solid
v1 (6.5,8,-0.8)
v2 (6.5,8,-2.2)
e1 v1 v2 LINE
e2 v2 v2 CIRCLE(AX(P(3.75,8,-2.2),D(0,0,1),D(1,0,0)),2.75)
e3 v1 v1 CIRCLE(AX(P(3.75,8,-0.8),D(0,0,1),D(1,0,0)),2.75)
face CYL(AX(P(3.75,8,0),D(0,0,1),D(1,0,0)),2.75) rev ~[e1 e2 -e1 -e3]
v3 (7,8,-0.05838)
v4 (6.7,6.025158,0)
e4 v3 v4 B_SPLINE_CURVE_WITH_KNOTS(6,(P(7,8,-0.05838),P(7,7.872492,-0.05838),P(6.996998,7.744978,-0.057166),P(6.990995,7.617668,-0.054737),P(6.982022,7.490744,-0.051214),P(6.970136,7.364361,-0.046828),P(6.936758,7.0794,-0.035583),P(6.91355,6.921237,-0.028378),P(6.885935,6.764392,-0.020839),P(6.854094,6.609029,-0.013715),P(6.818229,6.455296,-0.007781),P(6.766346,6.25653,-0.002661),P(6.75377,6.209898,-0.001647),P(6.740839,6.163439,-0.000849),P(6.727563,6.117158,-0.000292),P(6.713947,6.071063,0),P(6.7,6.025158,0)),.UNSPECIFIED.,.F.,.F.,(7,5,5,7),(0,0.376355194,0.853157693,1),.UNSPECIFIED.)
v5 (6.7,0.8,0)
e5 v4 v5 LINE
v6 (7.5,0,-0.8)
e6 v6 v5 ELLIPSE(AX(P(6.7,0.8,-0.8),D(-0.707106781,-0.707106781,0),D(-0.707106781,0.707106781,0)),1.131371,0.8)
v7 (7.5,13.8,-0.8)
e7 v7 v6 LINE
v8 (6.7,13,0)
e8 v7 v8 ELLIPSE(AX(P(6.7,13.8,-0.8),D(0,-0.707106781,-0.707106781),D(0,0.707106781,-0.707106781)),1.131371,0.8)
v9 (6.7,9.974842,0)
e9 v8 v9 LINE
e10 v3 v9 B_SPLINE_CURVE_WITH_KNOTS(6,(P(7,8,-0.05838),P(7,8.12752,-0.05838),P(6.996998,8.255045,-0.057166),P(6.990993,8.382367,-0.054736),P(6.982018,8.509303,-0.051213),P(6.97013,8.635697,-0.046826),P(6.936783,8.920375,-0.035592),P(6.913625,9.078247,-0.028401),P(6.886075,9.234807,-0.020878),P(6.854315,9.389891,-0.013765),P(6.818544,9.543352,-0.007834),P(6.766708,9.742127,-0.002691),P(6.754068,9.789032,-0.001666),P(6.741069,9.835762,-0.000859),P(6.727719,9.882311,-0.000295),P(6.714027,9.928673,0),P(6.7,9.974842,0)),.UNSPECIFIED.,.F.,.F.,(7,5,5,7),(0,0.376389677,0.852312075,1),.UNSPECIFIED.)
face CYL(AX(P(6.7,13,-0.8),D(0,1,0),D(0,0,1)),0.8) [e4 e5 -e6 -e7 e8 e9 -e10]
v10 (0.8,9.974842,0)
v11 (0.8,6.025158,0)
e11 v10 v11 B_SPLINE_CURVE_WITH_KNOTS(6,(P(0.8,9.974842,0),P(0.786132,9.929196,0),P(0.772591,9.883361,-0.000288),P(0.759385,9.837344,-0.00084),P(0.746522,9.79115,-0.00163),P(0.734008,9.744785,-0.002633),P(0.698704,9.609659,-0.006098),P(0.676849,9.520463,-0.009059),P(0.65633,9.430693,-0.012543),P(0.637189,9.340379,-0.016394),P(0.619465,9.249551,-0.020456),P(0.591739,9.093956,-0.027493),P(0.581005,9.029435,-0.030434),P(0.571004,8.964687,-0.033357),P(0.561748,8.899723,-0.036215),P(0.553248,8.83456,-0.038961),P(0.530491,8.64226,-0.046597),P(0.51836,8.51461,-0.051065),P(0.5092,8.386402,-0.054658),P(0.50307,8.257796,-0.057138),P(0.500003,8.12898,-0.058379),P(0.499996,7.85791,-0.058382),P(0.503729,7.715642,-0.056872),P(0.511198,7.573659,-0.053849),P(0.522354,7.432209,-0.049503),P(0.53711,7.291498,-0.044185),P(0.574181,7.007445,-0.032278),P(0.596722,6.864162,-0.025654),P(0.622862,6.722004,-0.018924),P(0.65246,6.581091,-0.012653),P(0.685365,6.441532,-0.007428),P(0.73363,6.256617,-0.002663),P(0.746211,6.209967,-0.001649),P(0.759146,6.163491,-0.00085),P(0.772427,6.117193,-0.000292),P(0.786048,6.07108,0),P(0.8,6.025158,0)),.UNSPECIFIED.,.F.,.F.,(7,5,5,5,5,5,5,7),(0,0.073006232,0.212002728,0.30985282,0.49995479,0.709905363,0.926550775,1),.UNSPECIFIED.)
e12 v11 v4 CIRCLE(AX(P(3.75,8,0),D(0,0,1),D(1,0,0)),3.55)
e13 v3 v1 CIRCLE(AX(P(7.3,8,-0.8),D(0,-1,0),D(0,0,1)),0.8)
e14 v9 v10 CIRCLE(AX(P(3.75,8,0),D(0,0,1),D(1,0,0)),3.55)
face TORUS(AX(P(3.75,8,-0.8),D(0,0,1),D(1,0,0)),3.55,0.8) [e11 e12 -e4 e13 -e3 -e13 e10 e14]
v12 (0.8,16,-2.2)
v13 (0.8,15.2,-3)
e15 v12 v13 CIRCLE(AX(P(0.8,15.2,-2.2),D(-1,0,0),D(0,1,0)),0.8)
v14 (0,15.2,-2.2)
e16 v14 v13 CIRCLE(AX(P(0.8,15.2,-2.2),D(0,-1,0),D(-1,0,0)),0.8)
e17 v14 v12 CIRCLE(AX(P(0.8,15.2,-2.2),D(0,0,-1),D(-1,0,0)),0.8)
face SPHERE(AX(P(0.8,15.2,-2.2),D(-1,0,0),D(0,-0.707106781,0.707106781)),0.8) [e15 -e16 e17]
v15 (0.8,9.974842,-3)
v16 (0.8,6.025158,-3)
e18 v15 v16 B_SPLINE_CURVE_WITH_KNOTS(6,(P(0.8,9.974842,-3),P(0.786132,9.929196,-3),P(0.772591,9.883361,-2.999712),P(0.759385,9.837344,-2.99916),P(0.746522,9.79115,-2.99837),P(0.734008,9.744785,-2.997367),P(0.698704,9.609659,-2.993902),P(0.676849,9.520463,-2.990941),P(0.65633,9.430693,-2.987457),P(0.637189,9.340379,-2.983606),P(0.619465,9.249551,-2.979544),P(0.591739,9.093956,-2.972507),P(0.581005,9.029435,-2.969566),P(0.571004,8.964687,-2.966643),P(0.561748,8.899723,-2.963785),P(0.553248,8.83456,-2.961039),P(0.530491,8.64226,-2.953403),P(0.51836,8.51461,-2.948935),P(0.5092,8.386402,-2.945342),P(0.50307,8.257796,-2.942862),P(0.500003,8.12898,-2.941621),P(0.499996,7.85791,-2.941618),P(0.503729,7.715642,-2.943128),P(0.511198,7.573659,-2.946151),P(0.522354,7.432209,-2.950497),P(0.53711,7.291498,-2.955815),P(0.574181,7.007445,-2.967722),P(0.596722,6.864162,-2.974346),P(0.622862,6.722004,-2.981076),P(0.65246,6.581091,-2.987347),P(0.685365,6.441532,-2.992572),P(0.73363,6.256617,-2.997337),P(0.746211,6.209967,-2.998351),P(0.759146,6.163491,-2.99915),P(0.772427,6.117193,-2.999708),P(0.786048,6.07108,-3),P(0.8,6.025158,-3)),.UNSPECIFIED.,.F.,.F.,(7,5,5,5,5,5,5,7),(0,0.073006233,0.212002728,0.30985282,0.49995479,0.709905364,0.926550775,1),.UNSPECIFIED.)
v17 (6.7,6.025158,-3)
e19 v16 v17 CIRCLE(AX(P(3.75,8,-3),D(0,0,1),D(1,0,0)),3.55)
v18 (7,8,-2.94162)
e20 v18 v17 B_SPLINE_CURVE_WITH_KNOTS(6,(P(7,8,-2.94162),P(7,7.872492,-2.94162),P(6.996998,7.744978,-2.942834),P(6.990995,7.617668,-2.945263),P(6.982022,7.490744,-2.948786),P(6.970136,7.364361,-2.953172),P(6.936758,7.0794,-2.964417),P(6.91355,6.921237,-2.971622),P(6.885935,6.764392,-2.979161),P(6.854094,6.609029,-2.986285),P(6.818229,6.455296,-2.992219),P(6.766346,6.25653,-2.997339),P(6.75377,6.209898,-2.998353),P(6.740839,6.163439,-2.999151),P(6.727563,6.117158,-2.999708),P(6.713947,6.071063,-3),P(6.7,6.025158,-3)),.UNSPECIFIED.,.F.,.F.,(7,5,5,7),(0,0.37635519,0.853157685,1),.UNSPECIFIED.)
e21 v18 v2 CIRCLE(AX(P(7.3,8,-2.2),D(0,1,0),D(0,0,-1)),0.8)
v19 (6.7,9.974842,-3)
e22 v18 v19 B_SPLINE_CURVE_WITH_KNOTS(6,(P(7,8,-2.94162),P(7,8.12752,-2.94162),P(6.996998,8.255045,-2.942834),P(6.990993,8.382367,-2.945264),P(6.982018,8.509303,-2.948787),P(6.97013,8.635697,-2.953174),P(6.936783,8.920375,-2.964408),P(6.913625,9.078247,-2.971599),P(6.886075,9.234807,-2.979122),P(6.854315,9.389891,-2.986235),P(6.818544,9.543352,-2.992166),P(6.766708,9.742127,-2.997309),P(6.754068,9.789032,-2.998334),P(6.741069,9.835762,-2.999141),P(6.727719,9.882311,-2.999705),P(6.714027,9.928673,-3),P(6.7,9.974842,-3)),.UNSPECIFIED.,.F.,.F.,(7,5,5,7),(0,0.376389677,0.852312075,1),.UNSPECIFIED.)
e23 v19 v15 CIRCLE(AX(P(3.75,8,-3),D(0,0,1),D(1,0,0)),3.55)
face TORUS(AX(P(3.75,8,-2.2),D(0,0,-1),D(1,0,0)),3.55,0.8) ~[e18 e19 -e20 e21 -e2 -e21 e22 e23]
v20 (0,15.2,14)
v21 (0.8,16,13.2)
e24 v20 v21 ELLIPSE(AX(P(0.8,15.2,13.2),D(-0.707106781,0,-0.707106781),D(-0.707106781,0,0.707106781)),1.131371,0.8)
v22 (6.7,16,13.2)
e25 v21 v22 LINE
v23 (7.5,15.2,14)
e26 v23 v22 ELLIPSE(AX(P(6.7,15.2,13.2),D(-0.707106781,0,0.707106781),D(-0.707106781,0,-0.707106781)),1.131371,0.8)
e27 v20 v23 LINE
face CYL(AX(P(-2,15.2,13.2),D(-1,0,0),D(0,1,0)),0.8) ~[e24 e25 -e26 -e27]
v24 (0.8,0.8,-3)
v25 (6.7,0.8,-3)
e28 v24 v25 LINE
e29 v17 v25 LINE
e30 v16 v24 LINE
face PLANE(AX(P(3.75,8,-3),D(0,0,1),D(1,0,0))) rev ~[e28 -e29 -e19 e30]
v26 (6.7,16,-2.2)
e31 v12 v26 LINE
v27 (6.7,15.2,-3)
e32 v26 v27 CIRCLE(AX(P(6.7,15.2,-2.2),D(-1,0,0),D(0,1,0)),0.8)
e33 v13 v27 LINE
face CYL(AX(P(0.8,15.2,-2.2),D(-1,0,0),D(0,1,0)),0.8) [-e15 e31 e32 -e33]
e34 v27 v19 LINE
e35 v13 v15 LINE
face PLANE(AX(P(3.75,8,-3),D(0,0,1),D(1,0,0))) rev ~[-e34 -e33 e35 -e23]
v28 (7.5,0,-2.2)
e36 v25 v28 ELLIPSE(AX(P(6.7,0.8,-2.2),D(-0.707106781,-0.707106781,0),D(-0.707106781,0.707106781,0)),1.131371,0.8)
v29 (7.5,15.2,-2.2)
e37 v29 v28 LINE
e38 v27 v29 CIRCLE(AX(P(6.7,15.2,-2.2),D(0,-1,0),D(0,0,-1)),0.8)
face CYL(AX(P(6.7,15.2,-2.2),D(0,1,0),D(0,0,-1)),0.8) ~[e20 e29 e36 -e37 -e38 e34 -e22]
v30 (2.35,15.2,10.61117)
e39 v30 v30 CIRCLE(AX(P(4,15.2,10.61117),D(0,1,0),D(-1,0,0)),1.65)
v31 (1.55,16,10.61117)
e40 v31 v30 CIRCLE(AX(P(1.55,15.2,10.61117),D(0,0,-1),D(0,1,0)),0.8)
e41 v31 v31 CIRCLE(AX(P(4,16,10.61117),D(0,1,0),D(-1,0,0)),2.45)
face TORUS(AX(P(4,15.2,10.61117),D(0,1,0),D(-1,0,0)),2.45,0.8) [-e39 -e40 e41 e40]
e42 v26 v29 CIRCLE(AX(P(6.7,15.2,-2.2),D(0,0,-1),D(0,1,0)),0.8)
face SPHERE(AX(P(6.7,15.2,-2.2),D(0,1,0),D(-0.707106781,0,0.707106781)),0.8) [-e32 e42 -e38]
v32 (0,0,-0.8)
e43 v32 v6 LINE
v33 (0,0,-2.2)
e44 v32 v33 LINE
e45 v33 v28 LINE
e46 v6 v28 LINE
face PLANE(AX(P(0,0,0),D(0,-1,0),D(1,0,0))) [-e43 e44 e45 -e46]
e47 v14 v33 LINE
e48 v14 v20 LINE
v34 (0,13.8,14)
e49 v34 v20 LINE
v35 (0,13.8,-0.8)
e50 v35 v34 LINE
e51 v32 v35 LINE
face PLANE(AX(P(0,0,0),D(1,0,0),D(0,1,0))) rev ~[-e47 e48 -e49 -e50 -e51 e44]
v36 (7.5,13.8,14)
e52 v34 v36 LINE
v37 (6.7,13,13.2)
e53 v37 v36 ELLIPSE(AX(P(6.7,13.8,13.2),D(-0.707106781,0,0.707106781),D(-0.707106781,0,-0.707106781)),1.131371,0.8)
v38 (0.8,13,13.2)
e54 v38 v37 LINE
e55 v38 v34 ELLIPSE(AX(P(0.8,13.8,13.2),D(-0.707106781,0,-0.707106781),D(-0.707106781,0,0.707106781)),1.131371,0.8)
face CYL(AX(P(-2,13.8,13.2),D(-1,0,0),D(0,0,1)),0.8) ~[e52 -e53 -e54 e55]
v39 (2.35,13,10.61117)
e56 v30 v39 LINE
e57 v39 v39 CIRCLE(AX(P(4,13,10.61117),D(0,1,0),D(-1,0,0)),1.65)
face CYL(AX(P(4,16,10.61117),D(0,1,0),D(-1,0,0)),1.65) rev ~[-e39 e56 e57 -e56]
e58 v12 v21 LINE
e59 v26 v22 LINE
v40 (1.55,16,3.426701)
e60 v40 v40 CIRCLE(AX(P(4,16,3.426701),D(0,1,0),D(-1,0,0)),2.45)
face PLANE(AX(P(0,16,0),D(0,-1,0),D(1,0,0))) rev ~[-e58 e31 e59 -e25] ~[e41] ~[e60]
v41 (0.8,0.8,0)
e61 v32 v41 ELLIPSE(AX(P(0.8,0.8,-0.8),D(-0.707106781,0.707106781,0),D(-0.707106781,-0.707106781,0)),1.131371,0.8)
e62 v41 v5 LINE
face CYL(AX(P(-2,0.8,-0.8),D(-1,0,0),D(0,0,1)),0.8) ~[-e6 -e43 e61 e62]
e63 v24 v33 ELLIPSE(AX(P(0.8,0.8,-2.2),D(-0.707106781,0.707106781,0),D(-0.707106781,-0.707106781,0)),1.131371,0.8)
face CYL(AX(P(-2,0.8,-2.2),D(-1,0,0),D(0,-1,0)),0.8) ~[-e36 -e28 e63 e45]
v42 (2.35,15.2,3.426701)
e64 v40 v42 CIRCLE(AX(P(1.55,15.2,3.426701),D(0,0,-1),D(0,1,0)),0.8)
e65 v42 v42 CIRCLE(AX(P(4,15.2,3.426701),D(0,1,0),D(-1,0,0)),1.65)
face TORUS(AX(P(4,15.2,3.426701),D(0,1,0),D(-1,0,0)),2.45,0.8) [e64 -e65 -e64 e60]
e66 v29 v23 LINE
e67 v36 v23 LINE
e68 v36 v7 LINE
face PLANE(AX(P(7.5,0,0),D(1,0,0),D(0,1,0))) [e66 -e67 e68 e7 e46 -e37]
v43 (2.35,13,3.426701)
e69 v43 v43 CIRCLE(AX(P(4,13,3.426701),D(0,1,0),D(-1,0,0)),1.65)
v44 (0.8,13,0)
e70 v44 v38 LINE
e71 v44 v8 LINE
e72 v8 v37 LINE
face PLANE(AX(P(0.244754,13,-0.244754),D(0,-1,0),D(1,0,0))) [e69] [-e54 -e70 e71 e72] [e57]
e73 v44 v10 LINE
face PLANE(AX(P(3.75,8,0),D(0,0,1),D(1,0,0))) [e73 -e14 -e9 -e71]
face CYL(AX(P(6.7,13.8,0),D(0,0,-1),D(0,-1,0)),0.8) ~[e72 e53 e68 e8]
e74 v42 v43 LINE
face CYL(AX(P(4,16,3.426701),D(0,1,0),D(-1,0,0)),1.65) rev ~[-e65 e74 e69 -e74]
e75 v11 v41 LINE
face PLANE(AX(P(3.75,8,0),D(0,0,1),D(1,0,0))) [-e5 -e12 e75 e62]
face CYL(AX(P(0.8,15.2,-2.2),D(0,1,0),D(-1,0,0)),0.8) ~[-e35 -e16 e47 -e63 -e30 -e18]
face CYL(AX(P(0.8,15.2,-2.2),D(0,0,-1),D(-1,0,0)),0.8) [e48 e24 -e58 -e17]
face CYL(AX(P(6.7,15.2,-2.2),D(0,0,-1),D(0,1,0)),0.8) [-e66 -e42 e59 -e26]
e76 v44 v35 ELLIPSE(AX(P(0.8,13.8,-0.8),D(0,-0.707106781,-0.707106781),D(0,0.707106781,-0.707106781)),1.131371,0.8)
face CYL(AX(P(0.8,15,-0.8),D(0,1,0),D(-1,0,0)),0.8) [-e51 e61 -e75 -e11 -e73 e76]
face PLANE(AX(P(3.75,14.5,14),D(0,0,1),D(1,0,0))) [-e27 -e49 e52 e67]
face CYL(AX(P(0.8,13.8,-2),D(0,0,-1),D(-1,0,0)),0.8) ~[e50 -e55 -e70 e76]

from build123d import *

# Parameters (mm, degrees)
F1_W         = 7.5
F1_H         = 3
F2_DEPTH     = 14
F0_W         = 7.5
F0_H         = 16
F0_R         = 2.75
F3_DEPTH     = 3
F4_R         = 1.65
F5_DEPTH     = 25
F6_T1_DEPTH  = 11.5
F6_T3_DEPTH  = 5.9
F6_T5_DEPTH  = 18.2
F6_T7_DEPTH  = 17.2
F6_T9_DEPTH  = 15
F6_T11_DEPTH = 16
F6_S15_W     = 0.8
F6_S15_H     = 0.8
F6_T16_DEPTH = 0.8
F6_S21_W     = 0.8
F6_S21_H     = 0.8
F6_T22_DEPTH = 0.8
F6_T37_DEPTH = 18
F6_T41_DEPTH = 17
F6_T48_DEPTH = 18
F6_T52_DEPTH = 17


# Not quite as in the source:
# - a fillet or chamfer that OpenCascade refuses, or shapes differently, is made with other operations: its cross-section is extruded or revolved along the edge and cut away or added


with BuildPart() as f2:
    # F1 (on face) → F2 (new body)
    with BuildSketch(Plane.XY):
        with Locations((3.75, 14.5)):
            Rectangle(F1_W, F1_H)
    extrude(amount=F2_DEPTH)

    # F0 (on Top) → F3 (join)
    with BuildSketch(Plane.XY):
        with Locations((3.75, 8)):
            Rectangle(F0_W, F0_H)
        with Locations((3.75, 8)):
            Circle(F0_R, mode=Mode.SUBTRACT)
    extrude(amount=-F3_DEPTH)

    # F4 (on face) → F5 (cut)
    with BuildSketch(Plane(origin=(0, 16, 0), x_dir=(-1, 0, 0), z_dir=(0, 1, 0))):
        with Locations((-4, 3.4267012961)):
            Circle(F4_R)
        with Locations((-4, 10.6111699715)):
            Circle(F4_R)
    extrude(amount=-F5_DEPTH, mode=Mode.SUBTRACT)

    # F6: fillet of radius 0.8 on 17 edges, made by hand

    # F6_s2 → F6_t1 (cut)
    with BuildSketch(Plane.YZ.offset(-2)):
        with BuildLine():
            ThreePointArc((16, 13.2), (15.7656854249, 13.7656854249), (15.2, 14))
            Line((15.2, 14), (16, 14))
            Line((16, 14), (16, 13.2))
        make_face()
        with BuildLine():
            ThreePointArc((13.8, 14), (13.2343145751, 13.7656854249), (13, 13.2))
            Line((13, 13.2), (13, 14))
            Line((13, 14), (13.8, 14))
        make_face()
        with BuildLine():
            ThreePointArc((0.8, 0), (0.2343145751, -0.2343145751), (0, -0.8))
            Line((0, -0.8), (0, 0))
            Line((0, 0), (0.8, 0))
        make_face()
        with BuildLine():
            ThreePointArc((0, -2.2), (0.2343145751, -2.7656854249), (0.8, -3))
            Line((0.8, -3), (0, -3))
            Line((0, -3), (0, -2.2))
        make_face()
    extrude(amount=F6_T1_DEPTH, mode=Mode.SUBTRACT)

    # F6_s4 → F6_t3 (cut)
    with BuildSketch(Plane.YZ.offset(0.8)):
        with BuildLine():
            ThreePointArc((16, -2.2), (15.7656854249, -2.7656854249), (15.2, -3))
            Line((15.2, -3), (16, -3))
            Line((16, -3), (16, -2.2))
        make_face()
    extrude(amount=F6_T3_DEPTH, mode=Mode.SUBTRACT)

    # F6_s6 → F6_t5 (cut)
    with BuildSketch(Plane.XY.offset(-2.2)):
        with BuildLine():
            ThreePointArc((0, 15.2), (0.2343145751, 15.7656854249), (0.8, 16))
            Line((0.8, 16), (0, 16))
            Line((0, 16), (0, 15.2))
        make_face()
        with BuildLine():
            ThreePointArc((6.7, 16), (7.2656854249, 15.7656854249), (7.5, 15.2))
            Line((7.5, 15.2), (7.5, 16))
            Line((7.5, 16), (6.7, 16))
        make_face()
    extrude(amount=F6_T5_DEPTH, mode=Mode.SUBTRACT)

    # F6_s8 → F6_t7 (cut)
    with BuildSketch(Plane.XZ.offset(-15.2)):
        with BuildLine():
            ThreePointArc((0, -2.2), (0.2343145751, -2.7656854249), (0.8, -3))
            Line((0.8, -3), (0, -3))
            Line((0, -3), (0, -2.2))
        make_face()
        with BuildLine():
            ThreePointArc((6.7, -3), (7.2656854249, -2.7656854249), (7.5, -2.2))
            Line((7.5, -2.2), (7.5, -3))
            Line((7.5, -3), (6.7, -3))
        make_face()
    extrude(amount=F6_T7_DEPTH, mode=Mode.SUBTRACT)

    # F6_s10 → F6_t9 (cut)
    with BuildSketch(Plane.XZ.offset(-13)):
        with BuildLine():
            ThreePointArc((0, -0.8), (0.2343145751, -0.2343145751), (0.8, 0))
            Line((0.8, 0), (0, 0))
            Line((0, 0), (0, -0.8))
        make_face()
        with BuildLine():
            ThreePointArc((6.7, 0), (7.2656854249, -0.2343145751), (7.5, -0.8))
            Line((7.5, -0.8), (7.5, 0))
            Line((7.5, 0), (6.7, 0))
        make_face()
    extrude(amount=F6_T9_DEPTH, mode=Mode.SUBTRACT)

    # F6_s12 → F6_t11 (cut)
    with BuildSketch(Plane.XY):
        with BuildLine():
            ThreePointArc((0, 13.8), (0.2343145751, 13.2343145751), (0.8, 13))
            Line((0.8, 13), (0, 13))
            Line((0, 13), (0, 13.8))
        make_face()
        with BuildLine():
            ThreePointArc((6.7, 13), (7.2656854249, 13.2343145751), (7.5, 13.8))
            Line((7.5, 13.8), (7.5, 13))
            Line((7.5, 13), (6.7, 13))
        make_face()
    extrude(amount=F6_T11_DEPTH, mode=Mode.SUBTRACT)


with BuildPart() as f6_tool14:
    # F6_s15 → F6_t16 (new body)
    with BuildSketch(Plane.XZ.offset(-15.2)):
        with Locations((7.1, -2.6)):
            Rectangle(F6_S15_W, F6_S15_H)
    extrude(amount=-F6_T16_DEPTH)

    # F6_s17 → F6_t18 (revolve, cut)
    with BuildSketch(Plane(origin=(6.7, 15.2, -2.2), x_dir=(-0.7071067812, 0, 0.7071067812), z_dir=(-0.7071067812, 0, -0.7071067812))):
        with BuildLine():
            ThreePointArc((0, -0.8), (0.8, 0), (0, 0.8))
            Line((0, 0.8), (0, -0.8))
        make_face()
    revolve(axis=Axis((6.7, 15.2, -2.2), (0, 1, 0)), mode=Mode.SUBTRACT)


with BuildPart() as f2_1:
    add(f2.part)

    # F6_t13: cut F6_tool14
    add(f6_tool14.part, mode=Mode.SUBTRACT)


with BuildPart() as f6_tool20:
    # F6_s21 → F6_t22 (new body)
    with BuildSketch(Plane.YZ.offset(0.8)):
        with Locations((15.6, -2.6)):
            Rectangle(F6_S21_W, F6_S21_H)
    extrude(amount=-F6_T22_DEPTH)

    # F6_s23 → F6_t24 (revolve, cut)
    with BuildSketch(Plane(origin=(0.8, 15.2, -2.2), x_dir=(0, -0.7071067812, 0.7071067812), z_dir=(0, -0.7071067812, -0.7071067812))):
        with BuildLine():
            ThreePointArc((0, -0.8), (0.8, 0), (0, 0.8))
            Line((0, 0.8), (0, -0.8))
        make_face()
    revolve(axis=Axis((0.8, 15.2, -2.2), (-1, 0, 0)), mode=Mode.SUBTRACT)


with BuildPart() as f2_2:
    add(f2_1.part)

    # F6_t19: cut F6_tool20
    add(f6_tool20.part, mode=Mode.SUBTRACT)

    # F6_s25 → F6_t26 (revolve, cut)
    with BuildSketch(Plane.XY.offset(10.6111699715)):
        with BuildLine():
            ThreePointArc((1.55, 16), (2.1156854249, 15.7656854249), (2.35, 15.2))
            Line((2.35, 15.2), (2.35, 16))
            Line((2.35, 16), (1.55, 16))
        make_face()
    revolve(axis=Axis((4, 16, 10.6111699715), (0, 1, 0)), mode=Mode.SUBTRACT)

    # F6_s27 → F6_t28 (revolve, cut)
    with BuildSketch(Plane.XY.offset(3.4267012961)):
        with BuildLine():
            ThreePointArc((1.55, 16), (2.1156854249, 15.7656854249), (2.35, 15.2))
            Line((2.35, 15.2), (2.35, 16))
            Line((2.35, 16), (1.55, 16))
        make_face()
    revolve(axis=Axis((4, 16, 3.4267012961), (0, 1, 0)), mode=Mode.SUBTRACT)

    # F6_s29 → F6_t30 (revolve, cut)
    with BuildSketch(Plane.XZ.offset(-8)):
        with BuildLine():
            ThreePointArc((7.3, -3), (6.7343145751, -2.7656854249), (6.5, -2.2))
            Line((6.5, -2.2), (6.5, -3))
            Line((6.5, -3), (7.3, -3))
        make_face()
    revolve(axis=Axis((3.75, 8, -3), (0, 0, 1)), mode=Mode.SUBTRACT)

    # F6_s31 → F6_t32 (revolve, cut)
    with BuildSketch(Plane.XZ.offset(-8)):
        with BuildLine():
            ThreePointArc((7.3, 0), (6.7343145751, -0.2343145751), (6.5, -0.8))
            Line((6.5, -0.8), (6.5, 0))
            Line((6.5, 0), (7.3, 0))
        make_face()
    revolve(axis=Axis((3.75, 8, 0), (0, 0, 1)), mode=Mode.SUBTRACT)


with BuildPart() as f6_tool35:
    # F6_s36 → F6_t37 (new body)
    with BuildSketch(Plane.XY.offset(-2)):
        with BuildLine():
            ThreePointArc((0, 13.8), (0.2343145751, 13.2343145751), (0.8, 13))
            Line((0.8, 13), (0, 13))
            Line((0, 13), (0, 13.8))
        make_face()
    extrude(amount=F6_T37_DEPTH)

    split(bisect_by=Plane.XY, keep=Keep.BOTTOM)


with BuildPart() as f6_tool39:
    # F6_s40 → F6_t41 (new body)
    with BuildSketch(Plane.XZ.offset(-15)):
        with BuildLine():
            ThreePointArc((0, -0.8), (0.2343145751, -0.2343145751), (0.8, 0))
            Line((0.8, 0), (0, 0))
            Line((0, 0), (0, -0.8))
        make_face()
    extrude(amount=F6_T41_DEPTH)

    split(bisect_by=Plane.XZ.offset(-13), keep=Keep.BOTTOM)


with BuildPart() as f6_tool35_1:
    add(f6_tool35.part)

    # F6_t43: intersect F6_tool39
    add(f6_tool39.part, mode=Mode.INTERSECT)


with BuildPart() as f2_3:
    add(f2_2.part)

    # F6_t33: cut F6_tool35
    add(f6_tool35_1.part, mode=Mode.SUBTRACT)


with BuildPart() as f6_tool46:
    # F6_s47 → F6_t48 (new body)
    with BuildSketch(Plane.XY.offset(-2)):
        with BuildLine():
            ThreePointArc((6.7, 13), (7.2656854249, 13.2343145751), (7.5, 13.8))
            Line((7.5, 13.8), (7.5, 13))
            Line((7.5, 13), (6.7, 13))
        make_face()
    extrude(amount=F6_T48_DEPTH)

    split(bisect_by=Plane.XY, keep=Keep.BOTTOM)


with BuildPart() as f6_tool50:
    # F6_s51 → F6_t52 (new body)
    with BuildSketch(Plane.XZ.offset(2)):
        with BuildLine():
            ThreePointArc((6.7, 0), (7.2656854249, -0.2343145751), (7.5, -0.8))
            Line((7.5, -0.8), (7.5, 0))
            Line((7.5, 0), (6.7, 0))
        make_face()
    extrude(amount=-F6_T52_DEPTH)

    split(bisect_by=Plane.XZ.offset(-13), keep=Keep.BOTTOM)


with BuildPart() as f6_tool46_1:
    add(f6_tool46.part)

    # F6_t54: intersect F6_tool50
    add(f6_tool50.part, mode=Mode.INTERSECT)


with BuildPart() as f2_4:
    add(f2_3.part)

    # F6_t44: cut F6_tool46
    add(f6_tool46_1.part, mode=Mode.SUBTRACT)


solid = f2_4.part
